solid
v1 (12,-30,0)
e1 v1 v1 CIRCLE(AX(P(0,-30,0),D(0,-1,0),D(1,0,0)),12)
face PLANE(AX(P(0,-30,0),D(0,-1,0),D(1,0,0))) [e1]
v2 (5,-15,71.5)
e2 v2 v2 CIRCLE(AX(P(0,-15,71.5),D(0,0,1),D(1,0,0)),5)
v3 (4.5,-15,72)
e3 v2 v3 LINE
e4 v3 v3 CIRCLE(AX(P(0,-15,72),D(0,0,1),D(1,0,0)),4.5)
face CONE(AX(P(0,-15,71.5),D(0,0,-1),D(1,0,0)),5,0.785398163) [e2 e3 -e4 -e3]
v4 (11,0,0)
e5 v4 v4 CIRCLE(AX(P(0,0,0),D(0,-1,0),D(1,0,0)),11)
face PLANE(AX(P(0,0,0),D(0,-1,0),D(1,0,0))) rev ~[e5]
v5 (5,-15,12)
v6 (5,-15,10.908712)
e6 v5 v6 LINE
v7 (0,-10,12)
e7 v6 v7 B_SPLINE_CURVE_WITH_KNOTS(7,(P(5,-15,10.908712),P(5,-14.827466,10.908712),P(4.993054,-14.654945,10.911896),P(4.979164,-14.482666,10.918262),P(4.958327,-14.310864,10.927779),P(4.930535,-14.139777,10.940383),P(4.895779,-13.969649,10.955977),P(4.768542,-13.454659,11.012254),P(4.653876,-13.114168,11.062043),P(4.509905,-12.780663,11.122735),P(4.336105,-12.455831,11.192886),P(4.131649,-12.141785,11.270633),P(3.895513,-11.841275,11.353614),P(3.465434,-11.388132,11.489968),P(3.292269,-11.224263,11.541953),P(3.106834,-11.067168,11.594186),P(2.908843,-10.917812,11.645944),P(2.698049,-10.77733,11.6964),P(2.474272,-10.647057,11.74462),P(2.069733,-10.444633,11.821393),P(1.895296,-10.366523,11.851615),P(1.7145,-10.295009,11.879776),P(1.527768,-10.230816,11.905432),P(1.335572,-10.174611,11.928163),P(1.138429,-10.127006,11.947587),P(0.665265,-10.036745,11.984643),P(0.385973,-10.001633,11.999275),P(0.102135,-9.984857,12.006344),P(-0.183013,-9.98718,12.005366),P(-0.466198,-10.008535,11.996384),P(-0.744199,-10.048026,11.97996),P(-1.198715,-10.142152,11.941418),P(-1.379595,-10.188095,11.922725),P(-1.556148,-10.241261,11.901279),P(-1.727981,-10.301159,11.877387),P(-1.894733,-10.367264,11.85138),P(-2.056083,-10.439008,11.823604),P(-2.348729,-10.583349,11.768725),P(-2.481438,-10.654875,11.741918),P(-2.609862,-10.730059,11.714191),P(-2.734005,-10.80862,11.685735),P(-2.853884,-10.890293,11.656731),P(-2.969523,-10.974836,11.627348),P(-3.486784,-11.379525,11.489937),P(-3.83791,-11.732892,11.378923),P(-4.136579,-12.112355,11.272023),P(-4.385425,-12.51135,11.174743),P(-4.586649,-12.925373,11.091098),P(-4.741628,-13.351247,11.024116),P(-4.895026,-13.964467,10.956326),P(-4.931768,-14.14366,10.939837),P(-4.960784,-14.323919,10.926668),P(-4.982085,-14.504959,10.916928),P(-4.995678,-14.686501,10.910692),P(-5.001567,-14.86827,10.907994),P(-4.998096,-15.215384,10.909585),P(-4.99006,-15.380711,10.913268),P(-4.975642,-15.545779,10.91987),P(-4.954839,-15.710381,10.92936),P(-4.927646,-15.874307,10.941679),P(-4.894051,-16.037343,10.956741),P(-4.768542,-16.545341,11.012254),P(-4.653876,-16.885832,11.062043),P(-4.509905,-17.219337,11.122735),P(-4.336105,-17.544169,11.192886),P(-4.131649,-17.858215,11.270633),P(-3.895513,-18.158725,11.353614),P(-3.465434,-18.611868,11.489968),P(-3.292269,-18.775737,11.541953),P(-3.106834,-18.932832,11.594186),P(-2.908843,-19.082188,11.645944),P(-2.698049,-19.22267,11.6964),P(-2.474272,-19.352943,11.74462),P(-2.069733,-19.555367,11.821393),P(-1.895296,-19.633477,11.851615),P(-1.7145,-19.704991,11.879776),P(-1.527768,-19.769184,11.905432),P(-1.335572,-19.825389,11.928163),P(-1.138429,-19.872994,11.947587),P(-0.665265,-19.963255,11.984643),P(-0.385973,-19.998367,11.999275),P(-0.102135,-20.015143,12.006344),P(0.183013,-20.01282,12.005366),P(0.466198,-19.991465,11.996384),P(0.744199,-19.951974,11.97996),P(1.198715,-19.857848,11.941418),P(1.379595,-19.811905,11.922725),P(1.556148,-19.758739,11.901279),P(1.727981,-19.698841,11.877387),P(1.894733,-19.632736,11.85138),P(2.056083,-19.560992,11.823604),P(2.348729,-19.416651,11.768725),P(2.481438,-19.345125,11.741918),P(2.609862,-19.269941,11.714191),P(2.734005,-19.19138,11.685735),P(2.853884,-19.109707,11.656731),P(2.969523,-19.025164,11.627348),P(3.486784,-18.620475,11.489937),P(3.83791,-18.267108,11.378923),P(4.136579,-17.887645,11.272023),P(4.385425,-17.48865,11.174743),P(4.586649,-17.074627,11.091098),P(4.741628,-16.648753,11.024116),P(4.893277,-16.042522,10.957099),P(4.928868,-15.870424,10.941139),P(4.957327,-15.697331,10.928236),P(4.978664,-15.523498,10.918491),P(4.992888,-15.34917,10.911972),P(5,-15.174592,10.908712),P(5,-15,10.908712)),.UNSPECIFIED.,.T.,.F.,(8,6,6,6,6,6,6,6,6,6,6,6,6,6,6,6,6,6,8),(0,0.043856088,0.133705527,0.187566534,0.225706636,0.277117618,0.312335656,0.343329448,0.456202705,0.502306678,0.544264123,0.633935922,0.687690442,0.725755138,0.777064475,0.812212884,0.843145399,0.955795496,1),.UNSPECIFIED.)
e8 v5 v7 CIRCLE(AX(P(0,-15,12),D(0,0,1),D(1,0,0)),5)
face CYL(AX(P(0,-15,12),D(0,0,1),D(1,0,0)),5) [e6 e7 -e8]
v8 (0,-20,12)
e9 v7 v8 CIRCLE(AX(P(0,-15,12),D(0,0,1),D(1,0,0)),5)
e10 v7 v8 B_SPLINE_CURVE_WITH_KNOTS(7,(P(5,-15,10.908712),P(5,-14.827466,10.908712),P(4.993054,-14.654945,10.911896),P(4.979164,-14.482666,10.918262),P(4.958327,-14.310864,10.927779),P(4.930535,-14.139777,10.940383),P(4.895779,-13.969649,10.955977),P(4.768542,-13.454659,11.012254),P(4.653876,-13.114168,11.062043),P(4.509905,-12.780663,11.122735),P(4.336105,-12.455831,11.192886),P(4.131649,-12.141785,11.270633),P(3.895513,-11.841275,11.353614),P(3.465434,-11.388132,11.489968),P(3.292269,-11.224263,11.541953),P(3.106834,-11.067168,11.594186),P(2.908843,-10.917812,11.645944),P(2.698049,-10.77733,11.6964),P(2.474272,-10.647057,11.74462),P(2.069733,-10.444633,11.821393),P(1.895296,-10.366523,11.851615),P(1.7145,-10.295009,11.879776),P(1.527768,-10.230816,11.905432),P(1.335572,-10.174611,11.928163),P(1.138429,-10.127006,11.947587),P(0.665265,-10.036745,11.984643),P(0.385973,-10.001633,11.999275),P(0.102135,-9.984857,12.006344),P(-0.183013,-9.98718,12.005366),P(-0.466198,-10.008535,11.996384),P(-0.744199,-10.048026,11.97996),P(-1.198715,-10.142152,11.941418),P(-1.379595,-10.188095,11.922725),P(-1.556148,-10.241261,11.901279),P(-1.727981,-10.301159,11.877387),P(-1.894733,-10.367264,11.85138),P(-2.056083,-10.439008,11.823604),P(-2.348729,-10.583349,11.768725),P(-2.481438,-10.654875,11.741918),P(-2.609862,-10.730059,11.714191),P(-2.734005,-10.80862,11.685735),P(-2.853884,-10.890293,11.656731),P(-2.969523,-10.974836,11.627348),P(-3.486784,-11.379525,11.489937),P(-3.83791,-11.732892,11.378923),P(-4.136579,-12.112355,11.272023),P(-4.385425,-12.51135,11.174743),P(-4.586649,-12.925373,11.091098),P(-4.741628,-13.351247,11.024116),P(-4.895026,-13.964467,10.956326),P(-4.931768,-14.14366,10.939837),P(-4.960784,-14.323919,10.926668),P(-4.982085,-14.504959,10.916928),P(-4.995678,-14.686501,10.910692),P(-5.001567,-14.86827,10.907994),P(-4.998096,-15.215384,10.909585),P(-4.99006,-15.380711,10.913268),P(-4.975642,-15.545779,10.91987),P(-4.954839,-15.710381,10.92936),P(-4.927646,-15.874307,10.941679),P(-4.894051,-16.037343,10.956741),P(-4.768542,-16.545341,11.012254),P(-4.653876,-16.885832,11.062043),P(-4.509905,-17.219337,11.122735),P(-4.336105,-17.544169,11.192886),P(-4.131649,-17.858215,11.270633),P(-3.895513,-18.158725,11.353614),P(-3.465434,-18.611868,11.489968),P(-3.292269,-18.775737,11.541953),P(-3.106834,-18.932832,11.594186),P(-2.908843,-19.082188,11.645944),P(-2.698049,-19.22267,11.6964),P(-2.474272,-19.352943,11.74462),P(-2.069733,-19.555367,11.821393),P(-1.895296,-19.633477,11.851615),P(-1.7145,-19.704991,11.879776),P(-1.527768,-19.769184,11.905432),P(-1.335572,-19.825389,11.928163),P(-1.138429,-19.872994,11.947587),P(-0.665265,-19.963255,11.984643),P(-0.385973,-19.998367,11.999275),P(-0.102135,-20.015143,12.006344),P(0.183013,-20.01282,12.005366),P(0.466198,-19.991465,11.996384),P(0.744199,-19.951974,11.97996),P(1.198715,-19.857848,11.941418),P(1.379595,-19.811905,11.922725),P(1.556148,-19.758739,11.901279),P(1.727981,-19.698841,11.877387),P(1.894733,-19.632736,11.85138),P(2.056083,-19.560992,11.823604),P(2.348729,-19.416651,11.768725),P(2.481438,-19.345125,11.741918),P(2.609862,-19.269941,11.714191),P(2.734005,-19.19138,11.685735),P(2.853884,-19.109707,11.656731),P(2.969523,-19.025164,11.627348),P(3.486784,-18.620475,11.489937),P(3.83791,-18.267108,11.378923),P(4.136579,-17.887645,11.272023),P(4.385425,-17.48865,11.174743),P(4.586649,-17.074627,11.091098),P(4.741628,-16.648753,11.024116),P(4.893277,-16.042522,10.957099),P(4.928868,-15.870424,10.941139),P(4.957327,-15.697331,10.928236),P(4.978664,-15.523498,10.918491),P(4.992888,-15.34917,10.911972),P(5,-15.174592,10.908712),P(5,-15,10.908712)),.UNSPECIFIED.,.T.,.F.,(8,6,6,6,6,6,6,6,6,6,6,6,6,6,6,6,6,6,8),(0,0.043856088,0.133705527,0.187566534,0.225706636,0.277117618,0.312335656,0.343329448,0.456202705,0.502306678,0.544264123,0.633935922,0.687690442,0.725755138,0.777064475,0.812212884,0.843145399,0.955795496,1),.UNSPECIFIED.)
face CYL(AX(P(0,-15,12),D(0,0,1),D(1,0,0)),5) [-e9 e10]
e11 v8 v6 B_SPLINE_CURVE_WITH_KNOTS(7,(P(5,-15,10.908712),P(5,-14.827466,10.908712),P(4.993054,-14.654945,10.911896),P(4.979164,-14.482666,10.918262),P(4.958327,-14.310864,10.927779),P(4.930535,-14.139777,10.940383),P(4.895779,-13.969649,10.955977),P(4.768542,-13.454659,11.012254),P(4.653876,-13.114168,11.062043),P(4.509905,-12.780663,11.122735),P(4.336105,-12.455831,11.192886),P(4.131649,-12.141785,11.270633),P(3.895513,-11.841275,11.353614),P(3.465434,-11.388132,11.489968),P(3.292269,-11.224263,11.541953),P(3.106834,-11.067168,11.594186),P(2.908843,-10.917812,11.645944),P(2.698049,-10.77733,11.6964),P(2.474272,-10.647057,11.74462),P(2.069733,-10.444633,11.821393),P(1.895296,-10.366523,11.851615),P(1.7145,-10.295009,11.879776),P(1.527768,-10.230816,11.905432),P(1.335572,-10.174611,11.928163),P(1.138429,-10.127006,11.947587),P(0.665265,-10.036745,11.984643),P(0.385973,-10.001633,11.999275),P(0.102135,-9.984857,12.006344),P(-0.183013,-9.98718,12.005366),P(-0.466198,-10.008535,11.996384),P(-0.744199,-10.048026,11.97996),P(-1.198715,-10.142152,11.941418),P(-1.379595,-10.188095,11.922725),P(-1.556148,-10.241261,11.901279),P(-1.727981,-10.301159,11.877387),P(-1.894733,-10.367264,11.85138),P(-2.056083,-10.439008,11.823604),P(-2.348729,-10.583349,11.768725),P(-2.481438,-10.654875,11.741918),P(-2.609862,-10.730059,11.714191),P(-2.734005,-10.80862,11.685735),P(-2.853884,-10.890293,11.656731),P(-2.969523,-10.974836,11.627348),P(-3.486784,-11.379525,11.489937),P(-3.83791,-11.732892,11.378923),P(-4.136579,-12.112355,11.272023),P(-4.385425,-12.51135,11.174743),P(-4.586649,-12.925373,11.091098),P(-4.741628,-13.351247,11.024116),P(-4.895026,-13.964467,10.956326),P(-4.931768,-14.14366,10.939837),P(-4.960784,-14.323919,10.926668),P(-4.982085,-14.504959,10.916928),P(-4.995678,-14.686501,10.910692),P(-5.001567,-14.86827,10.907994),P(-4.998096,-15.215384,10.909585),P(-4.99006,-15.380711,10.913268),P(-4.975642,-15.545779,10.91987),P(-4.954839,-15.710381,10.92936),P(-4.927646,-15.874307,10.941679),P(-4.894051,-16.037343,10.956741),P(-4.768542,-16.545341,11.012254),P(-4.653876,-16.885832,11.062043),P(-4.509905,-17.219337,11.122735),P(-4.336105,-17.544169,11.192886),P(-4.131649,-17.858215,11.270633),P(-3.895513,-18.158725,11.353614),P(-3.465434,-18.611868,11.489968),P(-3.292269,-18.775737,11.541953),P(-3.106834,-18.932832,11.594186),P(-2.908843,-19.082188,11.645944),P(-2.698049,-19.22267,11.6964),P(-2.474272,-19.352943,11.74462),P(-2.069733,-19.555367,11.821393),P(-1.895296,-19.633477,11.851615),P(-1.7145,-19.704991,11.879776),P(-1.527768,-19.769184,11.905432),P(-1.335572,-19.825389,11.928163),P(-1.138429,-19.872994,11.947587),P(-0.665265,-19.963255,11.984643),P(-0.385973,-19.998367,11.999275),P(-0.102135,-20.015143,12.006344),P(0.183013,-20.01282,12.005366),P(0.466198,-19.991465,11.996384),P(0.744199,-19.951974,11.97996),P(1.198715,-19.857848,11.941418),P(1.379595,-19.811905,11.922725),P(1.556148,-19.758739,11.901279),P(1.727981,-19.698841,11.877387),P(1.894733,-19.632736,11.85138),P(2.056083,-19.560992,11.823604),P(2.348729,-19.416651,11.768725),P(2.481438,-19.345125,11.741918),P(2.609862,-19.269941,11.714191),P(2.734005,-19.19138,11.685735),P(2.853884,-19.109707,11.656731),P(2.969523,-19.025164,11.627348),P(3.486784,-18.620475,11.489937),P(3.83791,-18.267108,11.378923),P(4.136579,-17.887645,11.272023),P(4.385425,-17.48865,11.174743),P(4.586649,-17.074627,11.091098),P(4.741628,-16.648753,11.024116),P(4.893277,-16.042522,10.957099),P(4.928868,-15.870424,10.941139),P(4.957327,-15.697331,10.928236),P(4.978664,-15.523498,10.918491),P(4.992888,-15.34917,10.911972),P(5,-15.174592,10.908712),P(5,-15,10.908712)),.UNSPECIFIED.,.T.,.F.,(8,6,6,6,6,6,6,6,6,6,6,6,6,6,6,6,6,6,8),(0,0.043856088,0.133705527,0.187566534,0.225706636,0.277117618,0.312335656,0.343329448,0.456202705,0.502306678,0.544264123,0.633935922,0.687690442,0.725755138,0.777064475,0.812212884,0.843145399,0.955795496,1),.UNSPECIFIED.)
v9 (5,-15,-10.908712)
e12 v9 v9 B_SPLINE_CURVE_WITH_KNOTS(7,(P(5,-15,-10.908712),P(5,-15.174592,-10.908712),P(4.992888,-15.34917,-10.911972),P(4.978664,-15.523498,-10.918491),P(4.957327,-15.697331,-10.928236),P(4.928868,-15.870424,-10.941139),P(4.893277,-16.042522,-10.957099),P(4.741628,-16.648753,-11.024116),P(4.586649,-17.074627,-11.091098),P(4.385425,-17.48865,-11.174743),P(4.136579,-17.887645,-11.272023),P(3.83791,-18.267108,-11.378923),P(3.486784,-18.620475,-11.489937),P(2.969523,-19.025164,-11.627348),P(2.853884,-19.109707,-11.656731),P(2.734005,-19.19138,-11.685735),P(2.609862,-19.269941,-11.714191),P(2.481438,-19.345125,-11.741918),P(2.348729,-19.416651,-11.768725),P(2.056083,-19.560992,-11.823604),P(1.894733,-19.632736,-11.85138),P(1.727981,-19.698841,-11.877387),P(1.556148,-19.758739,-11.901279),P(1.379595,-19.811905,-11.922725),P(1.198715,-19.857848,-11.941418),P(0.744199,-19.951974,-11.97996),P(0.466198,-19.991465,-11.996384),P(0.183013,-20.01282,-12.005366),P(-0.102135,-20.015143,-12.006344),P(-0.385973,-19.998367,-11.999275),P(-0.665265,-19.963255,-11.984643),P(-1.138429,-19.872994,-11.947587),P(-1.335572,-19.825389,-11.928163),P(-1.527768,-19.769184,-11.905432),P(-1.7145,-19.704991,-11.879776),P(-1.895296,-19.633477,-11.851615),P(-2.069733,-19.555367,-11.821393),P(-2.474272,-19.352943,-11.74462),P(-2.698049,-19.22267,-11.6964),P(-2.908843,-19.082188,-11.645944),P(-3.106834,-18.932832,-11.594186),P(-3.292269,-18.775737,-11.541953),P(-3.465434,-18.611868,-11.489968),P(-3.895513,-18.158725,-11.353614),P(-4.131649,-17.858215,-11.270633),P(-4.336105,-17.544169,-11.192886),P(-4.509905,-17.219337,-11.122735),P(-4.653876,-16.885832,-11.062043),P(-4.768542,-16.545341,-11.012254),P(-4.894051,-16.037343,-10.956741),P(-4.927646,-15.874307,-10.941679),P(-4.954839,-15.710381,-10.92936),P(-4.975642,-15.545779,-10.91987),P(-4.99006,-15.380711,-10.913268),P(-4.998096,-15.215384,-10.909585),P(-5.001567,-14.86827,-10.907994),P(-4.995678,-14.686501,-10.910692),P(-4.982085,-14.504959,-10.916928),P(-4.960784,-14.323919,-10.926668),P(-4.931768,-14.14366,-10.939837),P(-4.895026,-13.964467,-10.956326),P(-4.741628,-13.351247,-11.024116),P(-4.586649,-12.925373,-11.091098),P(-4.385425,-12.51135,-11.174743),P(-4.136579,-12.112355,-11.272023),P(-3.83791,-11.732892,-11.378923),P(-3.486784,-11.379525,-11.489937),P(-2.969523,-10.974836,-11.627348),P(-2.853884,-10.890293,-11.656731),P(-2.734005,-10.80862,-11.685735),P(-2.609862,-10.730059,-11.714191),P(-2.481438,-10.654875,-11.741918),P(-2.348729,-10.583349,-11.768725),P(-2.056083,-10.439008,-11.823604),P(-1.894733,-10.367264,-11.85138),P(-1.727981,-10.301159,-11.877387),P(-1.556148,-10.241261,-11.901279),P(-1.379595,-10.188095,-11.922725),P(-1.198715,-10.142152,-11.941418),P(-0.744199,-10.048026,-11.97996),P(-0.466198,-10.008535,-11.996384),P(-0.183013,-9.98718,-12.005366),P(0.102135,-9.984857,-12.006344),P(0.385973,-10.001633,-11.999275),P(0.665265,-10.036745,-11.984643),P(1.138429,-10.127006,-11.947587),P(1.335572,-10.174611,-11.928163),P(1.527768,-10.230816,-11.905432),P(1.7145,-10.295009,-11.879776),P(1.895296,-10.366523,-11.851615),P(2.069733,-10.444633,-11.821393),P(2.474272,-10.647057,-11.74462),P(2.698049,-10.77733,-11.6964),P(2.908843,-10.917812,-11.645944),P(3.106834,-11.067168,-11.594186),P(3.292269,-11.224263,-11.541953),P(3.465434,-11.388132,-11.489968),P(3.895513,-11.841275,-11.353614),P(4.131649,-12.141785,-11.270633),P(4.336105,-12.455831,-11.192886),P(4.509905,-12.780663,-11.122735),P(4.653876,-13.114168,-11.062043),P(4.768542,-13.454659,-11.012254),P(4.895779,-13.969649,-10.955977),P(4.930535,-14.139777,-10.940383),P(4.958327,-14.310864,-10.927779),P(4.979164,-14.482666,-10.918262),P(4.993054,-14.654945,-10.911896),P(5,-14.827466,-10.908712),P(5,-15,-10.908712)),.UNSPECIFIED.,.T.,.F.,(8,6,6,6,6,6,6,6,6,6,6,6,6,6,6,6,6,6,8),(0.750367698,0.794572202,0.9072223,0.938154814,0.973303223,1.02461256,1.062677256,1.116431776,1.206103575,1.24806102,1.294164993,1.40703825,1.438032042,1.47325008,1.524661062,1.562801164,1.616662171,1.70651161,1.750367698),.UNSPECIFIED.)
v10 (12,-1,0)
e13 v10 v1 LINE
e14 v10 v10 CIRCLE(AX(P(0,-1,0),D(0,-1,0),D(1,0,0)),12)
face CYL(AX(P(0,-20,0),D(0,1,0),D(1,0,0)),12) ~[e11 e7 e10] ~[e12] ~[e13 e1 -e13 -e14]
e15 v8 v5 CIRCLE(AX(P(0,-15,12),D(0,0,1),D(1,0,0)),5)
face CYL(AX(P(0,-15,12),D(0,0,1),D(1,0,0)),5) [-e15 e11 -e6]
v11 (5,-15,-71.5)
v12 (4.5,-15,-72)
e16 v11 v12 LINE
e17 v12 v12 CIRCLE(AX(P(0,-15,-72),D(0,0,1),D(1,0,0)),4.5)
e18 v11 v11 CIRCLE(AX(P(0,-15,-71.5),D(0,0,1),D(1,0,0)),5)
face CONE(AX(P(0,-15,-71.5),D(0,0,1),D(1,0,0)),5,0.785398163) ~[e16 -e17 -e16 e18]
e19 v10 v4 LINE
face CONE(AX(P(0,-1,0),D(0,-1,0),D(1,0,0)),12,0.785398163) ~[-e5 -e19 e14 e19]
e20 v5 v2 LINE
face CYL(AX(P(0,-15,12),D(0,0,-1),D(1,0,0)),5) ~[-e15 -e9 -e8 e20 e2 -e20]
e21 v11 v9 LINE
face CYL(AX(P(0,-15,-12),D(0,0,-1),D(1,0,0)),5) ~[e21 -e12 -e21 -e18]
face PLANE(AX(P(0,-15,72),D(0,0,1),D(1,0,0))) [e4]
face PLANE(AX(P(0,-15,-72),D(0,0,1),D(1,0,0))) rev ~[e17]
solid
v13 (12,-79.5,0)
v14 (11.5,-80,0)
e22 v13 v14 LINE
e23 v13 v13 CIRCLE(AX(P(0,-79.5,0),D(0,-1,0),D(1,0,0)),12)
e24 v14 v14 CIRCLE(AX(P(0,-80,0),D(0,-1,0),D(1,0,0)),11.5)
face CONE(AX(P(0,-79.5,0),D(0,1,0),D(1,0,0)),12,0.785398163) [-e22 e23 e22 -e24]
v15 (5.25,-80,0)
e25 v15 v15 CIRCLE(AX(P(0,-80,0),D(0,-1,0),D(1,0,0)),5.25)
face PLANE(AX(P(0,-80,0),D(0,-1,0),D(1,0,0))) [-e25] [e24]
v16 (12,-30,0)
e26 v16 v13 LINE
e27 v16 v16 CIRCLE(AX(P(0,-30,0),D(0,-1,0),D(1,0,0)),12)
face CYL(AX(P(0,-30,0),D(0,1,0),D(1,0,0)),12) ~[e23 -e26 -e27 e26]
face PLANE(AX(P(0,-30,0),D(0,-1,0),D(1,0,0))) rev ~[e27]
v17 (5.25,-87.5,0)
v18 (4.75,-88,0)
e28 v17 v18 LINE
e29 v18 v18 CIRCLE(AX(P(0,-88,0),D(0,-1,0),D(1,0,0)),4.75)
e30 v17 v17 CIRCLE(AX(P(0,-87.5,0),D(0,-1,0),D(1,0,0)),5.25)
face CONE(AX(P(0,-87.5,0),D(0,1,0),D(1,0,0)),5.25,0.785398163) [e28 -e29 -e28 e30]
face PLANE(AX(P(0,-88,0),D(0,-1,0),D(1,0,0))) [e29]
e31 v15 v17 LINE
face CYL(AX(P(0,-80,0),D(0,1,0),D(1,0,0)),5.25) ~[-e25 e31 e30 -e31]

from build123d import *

# Parameters (mm, degrees)
F0_R          = 12
F1_DEPTH      = 20
F2_R          = 12
F3_DEPTH      = 10
F6_R          = 5
F7_DEPTH      = 60
F7_DEPTH_BACK = 3
F8_R          = 5
F9_DEPTH      = 60
F9_DEPTH_BACK = 3
F10_SIZE      = 1
F11_SIZE      = 0.5
F12_R         = 12
F13_DEPTH     = 50
F14_R         = 5.25
F15_DEPTH     = 8
F16_SIZE      = 0.5


with BuildPart() as f1:
    # F0 (on Front) → F1 (new body)
    with BuildSketch(Plane.XZ):
        Circle(F0_R)
    extrude(amount=F1_DEPTH)

    # F2 (on face) → F3 (join)
    with BuildSketch(Plane.XZ.offset(20)):
        Circle(F2_R)
    extrude(amount=F3_DEPTH)

    # F6 (on offset) → F7 (join, two sides)
    with BuildSketch(Plane.XY.offset(12)) as f7_sk:
        with Locations((0, -15)):
            Circle(F6_R)
    extrude(amount=F7_DEPTH)
    extrude(f7_sk.sketch, amount=-F7_DEPTH_BACK)

    # F8 (on offset) → F9 (join, two sides)
    with BuildSketch(Plane.XY.offset(-12)) as f9_sk:
        with Locations((0, -15)):
            Circle(F8_R)
    extrude(amount=-F9_DEPTH)
    extrude(f9_sk.sketch, amount=F9_DEPTH_BACK)

    # F10
    f10_edges = [f1.edges().sort_by_distance(p)[0] for p in [
        (-12, 0, 0),
    ]]
    chamfer(f10_edges, length=F10_SIZE)

    # F11
    f11_edges = [f1.edges().sort_by_distance(p)[0] for p in [
        (-5, -15, 72),
        (-5, -15, -72),
    ]]
    chamfer(f11_edges, length=F11_SIZE)


with BuildPart() as f13:
    # F12 (on face) → F13 (new body)
    with BuildSketch(Plane.XZ.offset(30)):
        Circle(F12_R)
    extrude(amount=F13_DEPTH)

    # F14 (on face) → F15 (join)
    with BuildSketch(Plane.XZ.offset(80)):
        Circle(F14_R)
    extrude(amount=F15_DEPTH)

    # F16
    f16_edges = [f13.edges().sort_by_distance(p)[0] for p in [
        (-12, -80, 0),
        (-5.25, -88, 0),
    ]]
    chamfer(f16_edges, length=F16_SIZE)


solid = Compound([f1.part, f13.part])
